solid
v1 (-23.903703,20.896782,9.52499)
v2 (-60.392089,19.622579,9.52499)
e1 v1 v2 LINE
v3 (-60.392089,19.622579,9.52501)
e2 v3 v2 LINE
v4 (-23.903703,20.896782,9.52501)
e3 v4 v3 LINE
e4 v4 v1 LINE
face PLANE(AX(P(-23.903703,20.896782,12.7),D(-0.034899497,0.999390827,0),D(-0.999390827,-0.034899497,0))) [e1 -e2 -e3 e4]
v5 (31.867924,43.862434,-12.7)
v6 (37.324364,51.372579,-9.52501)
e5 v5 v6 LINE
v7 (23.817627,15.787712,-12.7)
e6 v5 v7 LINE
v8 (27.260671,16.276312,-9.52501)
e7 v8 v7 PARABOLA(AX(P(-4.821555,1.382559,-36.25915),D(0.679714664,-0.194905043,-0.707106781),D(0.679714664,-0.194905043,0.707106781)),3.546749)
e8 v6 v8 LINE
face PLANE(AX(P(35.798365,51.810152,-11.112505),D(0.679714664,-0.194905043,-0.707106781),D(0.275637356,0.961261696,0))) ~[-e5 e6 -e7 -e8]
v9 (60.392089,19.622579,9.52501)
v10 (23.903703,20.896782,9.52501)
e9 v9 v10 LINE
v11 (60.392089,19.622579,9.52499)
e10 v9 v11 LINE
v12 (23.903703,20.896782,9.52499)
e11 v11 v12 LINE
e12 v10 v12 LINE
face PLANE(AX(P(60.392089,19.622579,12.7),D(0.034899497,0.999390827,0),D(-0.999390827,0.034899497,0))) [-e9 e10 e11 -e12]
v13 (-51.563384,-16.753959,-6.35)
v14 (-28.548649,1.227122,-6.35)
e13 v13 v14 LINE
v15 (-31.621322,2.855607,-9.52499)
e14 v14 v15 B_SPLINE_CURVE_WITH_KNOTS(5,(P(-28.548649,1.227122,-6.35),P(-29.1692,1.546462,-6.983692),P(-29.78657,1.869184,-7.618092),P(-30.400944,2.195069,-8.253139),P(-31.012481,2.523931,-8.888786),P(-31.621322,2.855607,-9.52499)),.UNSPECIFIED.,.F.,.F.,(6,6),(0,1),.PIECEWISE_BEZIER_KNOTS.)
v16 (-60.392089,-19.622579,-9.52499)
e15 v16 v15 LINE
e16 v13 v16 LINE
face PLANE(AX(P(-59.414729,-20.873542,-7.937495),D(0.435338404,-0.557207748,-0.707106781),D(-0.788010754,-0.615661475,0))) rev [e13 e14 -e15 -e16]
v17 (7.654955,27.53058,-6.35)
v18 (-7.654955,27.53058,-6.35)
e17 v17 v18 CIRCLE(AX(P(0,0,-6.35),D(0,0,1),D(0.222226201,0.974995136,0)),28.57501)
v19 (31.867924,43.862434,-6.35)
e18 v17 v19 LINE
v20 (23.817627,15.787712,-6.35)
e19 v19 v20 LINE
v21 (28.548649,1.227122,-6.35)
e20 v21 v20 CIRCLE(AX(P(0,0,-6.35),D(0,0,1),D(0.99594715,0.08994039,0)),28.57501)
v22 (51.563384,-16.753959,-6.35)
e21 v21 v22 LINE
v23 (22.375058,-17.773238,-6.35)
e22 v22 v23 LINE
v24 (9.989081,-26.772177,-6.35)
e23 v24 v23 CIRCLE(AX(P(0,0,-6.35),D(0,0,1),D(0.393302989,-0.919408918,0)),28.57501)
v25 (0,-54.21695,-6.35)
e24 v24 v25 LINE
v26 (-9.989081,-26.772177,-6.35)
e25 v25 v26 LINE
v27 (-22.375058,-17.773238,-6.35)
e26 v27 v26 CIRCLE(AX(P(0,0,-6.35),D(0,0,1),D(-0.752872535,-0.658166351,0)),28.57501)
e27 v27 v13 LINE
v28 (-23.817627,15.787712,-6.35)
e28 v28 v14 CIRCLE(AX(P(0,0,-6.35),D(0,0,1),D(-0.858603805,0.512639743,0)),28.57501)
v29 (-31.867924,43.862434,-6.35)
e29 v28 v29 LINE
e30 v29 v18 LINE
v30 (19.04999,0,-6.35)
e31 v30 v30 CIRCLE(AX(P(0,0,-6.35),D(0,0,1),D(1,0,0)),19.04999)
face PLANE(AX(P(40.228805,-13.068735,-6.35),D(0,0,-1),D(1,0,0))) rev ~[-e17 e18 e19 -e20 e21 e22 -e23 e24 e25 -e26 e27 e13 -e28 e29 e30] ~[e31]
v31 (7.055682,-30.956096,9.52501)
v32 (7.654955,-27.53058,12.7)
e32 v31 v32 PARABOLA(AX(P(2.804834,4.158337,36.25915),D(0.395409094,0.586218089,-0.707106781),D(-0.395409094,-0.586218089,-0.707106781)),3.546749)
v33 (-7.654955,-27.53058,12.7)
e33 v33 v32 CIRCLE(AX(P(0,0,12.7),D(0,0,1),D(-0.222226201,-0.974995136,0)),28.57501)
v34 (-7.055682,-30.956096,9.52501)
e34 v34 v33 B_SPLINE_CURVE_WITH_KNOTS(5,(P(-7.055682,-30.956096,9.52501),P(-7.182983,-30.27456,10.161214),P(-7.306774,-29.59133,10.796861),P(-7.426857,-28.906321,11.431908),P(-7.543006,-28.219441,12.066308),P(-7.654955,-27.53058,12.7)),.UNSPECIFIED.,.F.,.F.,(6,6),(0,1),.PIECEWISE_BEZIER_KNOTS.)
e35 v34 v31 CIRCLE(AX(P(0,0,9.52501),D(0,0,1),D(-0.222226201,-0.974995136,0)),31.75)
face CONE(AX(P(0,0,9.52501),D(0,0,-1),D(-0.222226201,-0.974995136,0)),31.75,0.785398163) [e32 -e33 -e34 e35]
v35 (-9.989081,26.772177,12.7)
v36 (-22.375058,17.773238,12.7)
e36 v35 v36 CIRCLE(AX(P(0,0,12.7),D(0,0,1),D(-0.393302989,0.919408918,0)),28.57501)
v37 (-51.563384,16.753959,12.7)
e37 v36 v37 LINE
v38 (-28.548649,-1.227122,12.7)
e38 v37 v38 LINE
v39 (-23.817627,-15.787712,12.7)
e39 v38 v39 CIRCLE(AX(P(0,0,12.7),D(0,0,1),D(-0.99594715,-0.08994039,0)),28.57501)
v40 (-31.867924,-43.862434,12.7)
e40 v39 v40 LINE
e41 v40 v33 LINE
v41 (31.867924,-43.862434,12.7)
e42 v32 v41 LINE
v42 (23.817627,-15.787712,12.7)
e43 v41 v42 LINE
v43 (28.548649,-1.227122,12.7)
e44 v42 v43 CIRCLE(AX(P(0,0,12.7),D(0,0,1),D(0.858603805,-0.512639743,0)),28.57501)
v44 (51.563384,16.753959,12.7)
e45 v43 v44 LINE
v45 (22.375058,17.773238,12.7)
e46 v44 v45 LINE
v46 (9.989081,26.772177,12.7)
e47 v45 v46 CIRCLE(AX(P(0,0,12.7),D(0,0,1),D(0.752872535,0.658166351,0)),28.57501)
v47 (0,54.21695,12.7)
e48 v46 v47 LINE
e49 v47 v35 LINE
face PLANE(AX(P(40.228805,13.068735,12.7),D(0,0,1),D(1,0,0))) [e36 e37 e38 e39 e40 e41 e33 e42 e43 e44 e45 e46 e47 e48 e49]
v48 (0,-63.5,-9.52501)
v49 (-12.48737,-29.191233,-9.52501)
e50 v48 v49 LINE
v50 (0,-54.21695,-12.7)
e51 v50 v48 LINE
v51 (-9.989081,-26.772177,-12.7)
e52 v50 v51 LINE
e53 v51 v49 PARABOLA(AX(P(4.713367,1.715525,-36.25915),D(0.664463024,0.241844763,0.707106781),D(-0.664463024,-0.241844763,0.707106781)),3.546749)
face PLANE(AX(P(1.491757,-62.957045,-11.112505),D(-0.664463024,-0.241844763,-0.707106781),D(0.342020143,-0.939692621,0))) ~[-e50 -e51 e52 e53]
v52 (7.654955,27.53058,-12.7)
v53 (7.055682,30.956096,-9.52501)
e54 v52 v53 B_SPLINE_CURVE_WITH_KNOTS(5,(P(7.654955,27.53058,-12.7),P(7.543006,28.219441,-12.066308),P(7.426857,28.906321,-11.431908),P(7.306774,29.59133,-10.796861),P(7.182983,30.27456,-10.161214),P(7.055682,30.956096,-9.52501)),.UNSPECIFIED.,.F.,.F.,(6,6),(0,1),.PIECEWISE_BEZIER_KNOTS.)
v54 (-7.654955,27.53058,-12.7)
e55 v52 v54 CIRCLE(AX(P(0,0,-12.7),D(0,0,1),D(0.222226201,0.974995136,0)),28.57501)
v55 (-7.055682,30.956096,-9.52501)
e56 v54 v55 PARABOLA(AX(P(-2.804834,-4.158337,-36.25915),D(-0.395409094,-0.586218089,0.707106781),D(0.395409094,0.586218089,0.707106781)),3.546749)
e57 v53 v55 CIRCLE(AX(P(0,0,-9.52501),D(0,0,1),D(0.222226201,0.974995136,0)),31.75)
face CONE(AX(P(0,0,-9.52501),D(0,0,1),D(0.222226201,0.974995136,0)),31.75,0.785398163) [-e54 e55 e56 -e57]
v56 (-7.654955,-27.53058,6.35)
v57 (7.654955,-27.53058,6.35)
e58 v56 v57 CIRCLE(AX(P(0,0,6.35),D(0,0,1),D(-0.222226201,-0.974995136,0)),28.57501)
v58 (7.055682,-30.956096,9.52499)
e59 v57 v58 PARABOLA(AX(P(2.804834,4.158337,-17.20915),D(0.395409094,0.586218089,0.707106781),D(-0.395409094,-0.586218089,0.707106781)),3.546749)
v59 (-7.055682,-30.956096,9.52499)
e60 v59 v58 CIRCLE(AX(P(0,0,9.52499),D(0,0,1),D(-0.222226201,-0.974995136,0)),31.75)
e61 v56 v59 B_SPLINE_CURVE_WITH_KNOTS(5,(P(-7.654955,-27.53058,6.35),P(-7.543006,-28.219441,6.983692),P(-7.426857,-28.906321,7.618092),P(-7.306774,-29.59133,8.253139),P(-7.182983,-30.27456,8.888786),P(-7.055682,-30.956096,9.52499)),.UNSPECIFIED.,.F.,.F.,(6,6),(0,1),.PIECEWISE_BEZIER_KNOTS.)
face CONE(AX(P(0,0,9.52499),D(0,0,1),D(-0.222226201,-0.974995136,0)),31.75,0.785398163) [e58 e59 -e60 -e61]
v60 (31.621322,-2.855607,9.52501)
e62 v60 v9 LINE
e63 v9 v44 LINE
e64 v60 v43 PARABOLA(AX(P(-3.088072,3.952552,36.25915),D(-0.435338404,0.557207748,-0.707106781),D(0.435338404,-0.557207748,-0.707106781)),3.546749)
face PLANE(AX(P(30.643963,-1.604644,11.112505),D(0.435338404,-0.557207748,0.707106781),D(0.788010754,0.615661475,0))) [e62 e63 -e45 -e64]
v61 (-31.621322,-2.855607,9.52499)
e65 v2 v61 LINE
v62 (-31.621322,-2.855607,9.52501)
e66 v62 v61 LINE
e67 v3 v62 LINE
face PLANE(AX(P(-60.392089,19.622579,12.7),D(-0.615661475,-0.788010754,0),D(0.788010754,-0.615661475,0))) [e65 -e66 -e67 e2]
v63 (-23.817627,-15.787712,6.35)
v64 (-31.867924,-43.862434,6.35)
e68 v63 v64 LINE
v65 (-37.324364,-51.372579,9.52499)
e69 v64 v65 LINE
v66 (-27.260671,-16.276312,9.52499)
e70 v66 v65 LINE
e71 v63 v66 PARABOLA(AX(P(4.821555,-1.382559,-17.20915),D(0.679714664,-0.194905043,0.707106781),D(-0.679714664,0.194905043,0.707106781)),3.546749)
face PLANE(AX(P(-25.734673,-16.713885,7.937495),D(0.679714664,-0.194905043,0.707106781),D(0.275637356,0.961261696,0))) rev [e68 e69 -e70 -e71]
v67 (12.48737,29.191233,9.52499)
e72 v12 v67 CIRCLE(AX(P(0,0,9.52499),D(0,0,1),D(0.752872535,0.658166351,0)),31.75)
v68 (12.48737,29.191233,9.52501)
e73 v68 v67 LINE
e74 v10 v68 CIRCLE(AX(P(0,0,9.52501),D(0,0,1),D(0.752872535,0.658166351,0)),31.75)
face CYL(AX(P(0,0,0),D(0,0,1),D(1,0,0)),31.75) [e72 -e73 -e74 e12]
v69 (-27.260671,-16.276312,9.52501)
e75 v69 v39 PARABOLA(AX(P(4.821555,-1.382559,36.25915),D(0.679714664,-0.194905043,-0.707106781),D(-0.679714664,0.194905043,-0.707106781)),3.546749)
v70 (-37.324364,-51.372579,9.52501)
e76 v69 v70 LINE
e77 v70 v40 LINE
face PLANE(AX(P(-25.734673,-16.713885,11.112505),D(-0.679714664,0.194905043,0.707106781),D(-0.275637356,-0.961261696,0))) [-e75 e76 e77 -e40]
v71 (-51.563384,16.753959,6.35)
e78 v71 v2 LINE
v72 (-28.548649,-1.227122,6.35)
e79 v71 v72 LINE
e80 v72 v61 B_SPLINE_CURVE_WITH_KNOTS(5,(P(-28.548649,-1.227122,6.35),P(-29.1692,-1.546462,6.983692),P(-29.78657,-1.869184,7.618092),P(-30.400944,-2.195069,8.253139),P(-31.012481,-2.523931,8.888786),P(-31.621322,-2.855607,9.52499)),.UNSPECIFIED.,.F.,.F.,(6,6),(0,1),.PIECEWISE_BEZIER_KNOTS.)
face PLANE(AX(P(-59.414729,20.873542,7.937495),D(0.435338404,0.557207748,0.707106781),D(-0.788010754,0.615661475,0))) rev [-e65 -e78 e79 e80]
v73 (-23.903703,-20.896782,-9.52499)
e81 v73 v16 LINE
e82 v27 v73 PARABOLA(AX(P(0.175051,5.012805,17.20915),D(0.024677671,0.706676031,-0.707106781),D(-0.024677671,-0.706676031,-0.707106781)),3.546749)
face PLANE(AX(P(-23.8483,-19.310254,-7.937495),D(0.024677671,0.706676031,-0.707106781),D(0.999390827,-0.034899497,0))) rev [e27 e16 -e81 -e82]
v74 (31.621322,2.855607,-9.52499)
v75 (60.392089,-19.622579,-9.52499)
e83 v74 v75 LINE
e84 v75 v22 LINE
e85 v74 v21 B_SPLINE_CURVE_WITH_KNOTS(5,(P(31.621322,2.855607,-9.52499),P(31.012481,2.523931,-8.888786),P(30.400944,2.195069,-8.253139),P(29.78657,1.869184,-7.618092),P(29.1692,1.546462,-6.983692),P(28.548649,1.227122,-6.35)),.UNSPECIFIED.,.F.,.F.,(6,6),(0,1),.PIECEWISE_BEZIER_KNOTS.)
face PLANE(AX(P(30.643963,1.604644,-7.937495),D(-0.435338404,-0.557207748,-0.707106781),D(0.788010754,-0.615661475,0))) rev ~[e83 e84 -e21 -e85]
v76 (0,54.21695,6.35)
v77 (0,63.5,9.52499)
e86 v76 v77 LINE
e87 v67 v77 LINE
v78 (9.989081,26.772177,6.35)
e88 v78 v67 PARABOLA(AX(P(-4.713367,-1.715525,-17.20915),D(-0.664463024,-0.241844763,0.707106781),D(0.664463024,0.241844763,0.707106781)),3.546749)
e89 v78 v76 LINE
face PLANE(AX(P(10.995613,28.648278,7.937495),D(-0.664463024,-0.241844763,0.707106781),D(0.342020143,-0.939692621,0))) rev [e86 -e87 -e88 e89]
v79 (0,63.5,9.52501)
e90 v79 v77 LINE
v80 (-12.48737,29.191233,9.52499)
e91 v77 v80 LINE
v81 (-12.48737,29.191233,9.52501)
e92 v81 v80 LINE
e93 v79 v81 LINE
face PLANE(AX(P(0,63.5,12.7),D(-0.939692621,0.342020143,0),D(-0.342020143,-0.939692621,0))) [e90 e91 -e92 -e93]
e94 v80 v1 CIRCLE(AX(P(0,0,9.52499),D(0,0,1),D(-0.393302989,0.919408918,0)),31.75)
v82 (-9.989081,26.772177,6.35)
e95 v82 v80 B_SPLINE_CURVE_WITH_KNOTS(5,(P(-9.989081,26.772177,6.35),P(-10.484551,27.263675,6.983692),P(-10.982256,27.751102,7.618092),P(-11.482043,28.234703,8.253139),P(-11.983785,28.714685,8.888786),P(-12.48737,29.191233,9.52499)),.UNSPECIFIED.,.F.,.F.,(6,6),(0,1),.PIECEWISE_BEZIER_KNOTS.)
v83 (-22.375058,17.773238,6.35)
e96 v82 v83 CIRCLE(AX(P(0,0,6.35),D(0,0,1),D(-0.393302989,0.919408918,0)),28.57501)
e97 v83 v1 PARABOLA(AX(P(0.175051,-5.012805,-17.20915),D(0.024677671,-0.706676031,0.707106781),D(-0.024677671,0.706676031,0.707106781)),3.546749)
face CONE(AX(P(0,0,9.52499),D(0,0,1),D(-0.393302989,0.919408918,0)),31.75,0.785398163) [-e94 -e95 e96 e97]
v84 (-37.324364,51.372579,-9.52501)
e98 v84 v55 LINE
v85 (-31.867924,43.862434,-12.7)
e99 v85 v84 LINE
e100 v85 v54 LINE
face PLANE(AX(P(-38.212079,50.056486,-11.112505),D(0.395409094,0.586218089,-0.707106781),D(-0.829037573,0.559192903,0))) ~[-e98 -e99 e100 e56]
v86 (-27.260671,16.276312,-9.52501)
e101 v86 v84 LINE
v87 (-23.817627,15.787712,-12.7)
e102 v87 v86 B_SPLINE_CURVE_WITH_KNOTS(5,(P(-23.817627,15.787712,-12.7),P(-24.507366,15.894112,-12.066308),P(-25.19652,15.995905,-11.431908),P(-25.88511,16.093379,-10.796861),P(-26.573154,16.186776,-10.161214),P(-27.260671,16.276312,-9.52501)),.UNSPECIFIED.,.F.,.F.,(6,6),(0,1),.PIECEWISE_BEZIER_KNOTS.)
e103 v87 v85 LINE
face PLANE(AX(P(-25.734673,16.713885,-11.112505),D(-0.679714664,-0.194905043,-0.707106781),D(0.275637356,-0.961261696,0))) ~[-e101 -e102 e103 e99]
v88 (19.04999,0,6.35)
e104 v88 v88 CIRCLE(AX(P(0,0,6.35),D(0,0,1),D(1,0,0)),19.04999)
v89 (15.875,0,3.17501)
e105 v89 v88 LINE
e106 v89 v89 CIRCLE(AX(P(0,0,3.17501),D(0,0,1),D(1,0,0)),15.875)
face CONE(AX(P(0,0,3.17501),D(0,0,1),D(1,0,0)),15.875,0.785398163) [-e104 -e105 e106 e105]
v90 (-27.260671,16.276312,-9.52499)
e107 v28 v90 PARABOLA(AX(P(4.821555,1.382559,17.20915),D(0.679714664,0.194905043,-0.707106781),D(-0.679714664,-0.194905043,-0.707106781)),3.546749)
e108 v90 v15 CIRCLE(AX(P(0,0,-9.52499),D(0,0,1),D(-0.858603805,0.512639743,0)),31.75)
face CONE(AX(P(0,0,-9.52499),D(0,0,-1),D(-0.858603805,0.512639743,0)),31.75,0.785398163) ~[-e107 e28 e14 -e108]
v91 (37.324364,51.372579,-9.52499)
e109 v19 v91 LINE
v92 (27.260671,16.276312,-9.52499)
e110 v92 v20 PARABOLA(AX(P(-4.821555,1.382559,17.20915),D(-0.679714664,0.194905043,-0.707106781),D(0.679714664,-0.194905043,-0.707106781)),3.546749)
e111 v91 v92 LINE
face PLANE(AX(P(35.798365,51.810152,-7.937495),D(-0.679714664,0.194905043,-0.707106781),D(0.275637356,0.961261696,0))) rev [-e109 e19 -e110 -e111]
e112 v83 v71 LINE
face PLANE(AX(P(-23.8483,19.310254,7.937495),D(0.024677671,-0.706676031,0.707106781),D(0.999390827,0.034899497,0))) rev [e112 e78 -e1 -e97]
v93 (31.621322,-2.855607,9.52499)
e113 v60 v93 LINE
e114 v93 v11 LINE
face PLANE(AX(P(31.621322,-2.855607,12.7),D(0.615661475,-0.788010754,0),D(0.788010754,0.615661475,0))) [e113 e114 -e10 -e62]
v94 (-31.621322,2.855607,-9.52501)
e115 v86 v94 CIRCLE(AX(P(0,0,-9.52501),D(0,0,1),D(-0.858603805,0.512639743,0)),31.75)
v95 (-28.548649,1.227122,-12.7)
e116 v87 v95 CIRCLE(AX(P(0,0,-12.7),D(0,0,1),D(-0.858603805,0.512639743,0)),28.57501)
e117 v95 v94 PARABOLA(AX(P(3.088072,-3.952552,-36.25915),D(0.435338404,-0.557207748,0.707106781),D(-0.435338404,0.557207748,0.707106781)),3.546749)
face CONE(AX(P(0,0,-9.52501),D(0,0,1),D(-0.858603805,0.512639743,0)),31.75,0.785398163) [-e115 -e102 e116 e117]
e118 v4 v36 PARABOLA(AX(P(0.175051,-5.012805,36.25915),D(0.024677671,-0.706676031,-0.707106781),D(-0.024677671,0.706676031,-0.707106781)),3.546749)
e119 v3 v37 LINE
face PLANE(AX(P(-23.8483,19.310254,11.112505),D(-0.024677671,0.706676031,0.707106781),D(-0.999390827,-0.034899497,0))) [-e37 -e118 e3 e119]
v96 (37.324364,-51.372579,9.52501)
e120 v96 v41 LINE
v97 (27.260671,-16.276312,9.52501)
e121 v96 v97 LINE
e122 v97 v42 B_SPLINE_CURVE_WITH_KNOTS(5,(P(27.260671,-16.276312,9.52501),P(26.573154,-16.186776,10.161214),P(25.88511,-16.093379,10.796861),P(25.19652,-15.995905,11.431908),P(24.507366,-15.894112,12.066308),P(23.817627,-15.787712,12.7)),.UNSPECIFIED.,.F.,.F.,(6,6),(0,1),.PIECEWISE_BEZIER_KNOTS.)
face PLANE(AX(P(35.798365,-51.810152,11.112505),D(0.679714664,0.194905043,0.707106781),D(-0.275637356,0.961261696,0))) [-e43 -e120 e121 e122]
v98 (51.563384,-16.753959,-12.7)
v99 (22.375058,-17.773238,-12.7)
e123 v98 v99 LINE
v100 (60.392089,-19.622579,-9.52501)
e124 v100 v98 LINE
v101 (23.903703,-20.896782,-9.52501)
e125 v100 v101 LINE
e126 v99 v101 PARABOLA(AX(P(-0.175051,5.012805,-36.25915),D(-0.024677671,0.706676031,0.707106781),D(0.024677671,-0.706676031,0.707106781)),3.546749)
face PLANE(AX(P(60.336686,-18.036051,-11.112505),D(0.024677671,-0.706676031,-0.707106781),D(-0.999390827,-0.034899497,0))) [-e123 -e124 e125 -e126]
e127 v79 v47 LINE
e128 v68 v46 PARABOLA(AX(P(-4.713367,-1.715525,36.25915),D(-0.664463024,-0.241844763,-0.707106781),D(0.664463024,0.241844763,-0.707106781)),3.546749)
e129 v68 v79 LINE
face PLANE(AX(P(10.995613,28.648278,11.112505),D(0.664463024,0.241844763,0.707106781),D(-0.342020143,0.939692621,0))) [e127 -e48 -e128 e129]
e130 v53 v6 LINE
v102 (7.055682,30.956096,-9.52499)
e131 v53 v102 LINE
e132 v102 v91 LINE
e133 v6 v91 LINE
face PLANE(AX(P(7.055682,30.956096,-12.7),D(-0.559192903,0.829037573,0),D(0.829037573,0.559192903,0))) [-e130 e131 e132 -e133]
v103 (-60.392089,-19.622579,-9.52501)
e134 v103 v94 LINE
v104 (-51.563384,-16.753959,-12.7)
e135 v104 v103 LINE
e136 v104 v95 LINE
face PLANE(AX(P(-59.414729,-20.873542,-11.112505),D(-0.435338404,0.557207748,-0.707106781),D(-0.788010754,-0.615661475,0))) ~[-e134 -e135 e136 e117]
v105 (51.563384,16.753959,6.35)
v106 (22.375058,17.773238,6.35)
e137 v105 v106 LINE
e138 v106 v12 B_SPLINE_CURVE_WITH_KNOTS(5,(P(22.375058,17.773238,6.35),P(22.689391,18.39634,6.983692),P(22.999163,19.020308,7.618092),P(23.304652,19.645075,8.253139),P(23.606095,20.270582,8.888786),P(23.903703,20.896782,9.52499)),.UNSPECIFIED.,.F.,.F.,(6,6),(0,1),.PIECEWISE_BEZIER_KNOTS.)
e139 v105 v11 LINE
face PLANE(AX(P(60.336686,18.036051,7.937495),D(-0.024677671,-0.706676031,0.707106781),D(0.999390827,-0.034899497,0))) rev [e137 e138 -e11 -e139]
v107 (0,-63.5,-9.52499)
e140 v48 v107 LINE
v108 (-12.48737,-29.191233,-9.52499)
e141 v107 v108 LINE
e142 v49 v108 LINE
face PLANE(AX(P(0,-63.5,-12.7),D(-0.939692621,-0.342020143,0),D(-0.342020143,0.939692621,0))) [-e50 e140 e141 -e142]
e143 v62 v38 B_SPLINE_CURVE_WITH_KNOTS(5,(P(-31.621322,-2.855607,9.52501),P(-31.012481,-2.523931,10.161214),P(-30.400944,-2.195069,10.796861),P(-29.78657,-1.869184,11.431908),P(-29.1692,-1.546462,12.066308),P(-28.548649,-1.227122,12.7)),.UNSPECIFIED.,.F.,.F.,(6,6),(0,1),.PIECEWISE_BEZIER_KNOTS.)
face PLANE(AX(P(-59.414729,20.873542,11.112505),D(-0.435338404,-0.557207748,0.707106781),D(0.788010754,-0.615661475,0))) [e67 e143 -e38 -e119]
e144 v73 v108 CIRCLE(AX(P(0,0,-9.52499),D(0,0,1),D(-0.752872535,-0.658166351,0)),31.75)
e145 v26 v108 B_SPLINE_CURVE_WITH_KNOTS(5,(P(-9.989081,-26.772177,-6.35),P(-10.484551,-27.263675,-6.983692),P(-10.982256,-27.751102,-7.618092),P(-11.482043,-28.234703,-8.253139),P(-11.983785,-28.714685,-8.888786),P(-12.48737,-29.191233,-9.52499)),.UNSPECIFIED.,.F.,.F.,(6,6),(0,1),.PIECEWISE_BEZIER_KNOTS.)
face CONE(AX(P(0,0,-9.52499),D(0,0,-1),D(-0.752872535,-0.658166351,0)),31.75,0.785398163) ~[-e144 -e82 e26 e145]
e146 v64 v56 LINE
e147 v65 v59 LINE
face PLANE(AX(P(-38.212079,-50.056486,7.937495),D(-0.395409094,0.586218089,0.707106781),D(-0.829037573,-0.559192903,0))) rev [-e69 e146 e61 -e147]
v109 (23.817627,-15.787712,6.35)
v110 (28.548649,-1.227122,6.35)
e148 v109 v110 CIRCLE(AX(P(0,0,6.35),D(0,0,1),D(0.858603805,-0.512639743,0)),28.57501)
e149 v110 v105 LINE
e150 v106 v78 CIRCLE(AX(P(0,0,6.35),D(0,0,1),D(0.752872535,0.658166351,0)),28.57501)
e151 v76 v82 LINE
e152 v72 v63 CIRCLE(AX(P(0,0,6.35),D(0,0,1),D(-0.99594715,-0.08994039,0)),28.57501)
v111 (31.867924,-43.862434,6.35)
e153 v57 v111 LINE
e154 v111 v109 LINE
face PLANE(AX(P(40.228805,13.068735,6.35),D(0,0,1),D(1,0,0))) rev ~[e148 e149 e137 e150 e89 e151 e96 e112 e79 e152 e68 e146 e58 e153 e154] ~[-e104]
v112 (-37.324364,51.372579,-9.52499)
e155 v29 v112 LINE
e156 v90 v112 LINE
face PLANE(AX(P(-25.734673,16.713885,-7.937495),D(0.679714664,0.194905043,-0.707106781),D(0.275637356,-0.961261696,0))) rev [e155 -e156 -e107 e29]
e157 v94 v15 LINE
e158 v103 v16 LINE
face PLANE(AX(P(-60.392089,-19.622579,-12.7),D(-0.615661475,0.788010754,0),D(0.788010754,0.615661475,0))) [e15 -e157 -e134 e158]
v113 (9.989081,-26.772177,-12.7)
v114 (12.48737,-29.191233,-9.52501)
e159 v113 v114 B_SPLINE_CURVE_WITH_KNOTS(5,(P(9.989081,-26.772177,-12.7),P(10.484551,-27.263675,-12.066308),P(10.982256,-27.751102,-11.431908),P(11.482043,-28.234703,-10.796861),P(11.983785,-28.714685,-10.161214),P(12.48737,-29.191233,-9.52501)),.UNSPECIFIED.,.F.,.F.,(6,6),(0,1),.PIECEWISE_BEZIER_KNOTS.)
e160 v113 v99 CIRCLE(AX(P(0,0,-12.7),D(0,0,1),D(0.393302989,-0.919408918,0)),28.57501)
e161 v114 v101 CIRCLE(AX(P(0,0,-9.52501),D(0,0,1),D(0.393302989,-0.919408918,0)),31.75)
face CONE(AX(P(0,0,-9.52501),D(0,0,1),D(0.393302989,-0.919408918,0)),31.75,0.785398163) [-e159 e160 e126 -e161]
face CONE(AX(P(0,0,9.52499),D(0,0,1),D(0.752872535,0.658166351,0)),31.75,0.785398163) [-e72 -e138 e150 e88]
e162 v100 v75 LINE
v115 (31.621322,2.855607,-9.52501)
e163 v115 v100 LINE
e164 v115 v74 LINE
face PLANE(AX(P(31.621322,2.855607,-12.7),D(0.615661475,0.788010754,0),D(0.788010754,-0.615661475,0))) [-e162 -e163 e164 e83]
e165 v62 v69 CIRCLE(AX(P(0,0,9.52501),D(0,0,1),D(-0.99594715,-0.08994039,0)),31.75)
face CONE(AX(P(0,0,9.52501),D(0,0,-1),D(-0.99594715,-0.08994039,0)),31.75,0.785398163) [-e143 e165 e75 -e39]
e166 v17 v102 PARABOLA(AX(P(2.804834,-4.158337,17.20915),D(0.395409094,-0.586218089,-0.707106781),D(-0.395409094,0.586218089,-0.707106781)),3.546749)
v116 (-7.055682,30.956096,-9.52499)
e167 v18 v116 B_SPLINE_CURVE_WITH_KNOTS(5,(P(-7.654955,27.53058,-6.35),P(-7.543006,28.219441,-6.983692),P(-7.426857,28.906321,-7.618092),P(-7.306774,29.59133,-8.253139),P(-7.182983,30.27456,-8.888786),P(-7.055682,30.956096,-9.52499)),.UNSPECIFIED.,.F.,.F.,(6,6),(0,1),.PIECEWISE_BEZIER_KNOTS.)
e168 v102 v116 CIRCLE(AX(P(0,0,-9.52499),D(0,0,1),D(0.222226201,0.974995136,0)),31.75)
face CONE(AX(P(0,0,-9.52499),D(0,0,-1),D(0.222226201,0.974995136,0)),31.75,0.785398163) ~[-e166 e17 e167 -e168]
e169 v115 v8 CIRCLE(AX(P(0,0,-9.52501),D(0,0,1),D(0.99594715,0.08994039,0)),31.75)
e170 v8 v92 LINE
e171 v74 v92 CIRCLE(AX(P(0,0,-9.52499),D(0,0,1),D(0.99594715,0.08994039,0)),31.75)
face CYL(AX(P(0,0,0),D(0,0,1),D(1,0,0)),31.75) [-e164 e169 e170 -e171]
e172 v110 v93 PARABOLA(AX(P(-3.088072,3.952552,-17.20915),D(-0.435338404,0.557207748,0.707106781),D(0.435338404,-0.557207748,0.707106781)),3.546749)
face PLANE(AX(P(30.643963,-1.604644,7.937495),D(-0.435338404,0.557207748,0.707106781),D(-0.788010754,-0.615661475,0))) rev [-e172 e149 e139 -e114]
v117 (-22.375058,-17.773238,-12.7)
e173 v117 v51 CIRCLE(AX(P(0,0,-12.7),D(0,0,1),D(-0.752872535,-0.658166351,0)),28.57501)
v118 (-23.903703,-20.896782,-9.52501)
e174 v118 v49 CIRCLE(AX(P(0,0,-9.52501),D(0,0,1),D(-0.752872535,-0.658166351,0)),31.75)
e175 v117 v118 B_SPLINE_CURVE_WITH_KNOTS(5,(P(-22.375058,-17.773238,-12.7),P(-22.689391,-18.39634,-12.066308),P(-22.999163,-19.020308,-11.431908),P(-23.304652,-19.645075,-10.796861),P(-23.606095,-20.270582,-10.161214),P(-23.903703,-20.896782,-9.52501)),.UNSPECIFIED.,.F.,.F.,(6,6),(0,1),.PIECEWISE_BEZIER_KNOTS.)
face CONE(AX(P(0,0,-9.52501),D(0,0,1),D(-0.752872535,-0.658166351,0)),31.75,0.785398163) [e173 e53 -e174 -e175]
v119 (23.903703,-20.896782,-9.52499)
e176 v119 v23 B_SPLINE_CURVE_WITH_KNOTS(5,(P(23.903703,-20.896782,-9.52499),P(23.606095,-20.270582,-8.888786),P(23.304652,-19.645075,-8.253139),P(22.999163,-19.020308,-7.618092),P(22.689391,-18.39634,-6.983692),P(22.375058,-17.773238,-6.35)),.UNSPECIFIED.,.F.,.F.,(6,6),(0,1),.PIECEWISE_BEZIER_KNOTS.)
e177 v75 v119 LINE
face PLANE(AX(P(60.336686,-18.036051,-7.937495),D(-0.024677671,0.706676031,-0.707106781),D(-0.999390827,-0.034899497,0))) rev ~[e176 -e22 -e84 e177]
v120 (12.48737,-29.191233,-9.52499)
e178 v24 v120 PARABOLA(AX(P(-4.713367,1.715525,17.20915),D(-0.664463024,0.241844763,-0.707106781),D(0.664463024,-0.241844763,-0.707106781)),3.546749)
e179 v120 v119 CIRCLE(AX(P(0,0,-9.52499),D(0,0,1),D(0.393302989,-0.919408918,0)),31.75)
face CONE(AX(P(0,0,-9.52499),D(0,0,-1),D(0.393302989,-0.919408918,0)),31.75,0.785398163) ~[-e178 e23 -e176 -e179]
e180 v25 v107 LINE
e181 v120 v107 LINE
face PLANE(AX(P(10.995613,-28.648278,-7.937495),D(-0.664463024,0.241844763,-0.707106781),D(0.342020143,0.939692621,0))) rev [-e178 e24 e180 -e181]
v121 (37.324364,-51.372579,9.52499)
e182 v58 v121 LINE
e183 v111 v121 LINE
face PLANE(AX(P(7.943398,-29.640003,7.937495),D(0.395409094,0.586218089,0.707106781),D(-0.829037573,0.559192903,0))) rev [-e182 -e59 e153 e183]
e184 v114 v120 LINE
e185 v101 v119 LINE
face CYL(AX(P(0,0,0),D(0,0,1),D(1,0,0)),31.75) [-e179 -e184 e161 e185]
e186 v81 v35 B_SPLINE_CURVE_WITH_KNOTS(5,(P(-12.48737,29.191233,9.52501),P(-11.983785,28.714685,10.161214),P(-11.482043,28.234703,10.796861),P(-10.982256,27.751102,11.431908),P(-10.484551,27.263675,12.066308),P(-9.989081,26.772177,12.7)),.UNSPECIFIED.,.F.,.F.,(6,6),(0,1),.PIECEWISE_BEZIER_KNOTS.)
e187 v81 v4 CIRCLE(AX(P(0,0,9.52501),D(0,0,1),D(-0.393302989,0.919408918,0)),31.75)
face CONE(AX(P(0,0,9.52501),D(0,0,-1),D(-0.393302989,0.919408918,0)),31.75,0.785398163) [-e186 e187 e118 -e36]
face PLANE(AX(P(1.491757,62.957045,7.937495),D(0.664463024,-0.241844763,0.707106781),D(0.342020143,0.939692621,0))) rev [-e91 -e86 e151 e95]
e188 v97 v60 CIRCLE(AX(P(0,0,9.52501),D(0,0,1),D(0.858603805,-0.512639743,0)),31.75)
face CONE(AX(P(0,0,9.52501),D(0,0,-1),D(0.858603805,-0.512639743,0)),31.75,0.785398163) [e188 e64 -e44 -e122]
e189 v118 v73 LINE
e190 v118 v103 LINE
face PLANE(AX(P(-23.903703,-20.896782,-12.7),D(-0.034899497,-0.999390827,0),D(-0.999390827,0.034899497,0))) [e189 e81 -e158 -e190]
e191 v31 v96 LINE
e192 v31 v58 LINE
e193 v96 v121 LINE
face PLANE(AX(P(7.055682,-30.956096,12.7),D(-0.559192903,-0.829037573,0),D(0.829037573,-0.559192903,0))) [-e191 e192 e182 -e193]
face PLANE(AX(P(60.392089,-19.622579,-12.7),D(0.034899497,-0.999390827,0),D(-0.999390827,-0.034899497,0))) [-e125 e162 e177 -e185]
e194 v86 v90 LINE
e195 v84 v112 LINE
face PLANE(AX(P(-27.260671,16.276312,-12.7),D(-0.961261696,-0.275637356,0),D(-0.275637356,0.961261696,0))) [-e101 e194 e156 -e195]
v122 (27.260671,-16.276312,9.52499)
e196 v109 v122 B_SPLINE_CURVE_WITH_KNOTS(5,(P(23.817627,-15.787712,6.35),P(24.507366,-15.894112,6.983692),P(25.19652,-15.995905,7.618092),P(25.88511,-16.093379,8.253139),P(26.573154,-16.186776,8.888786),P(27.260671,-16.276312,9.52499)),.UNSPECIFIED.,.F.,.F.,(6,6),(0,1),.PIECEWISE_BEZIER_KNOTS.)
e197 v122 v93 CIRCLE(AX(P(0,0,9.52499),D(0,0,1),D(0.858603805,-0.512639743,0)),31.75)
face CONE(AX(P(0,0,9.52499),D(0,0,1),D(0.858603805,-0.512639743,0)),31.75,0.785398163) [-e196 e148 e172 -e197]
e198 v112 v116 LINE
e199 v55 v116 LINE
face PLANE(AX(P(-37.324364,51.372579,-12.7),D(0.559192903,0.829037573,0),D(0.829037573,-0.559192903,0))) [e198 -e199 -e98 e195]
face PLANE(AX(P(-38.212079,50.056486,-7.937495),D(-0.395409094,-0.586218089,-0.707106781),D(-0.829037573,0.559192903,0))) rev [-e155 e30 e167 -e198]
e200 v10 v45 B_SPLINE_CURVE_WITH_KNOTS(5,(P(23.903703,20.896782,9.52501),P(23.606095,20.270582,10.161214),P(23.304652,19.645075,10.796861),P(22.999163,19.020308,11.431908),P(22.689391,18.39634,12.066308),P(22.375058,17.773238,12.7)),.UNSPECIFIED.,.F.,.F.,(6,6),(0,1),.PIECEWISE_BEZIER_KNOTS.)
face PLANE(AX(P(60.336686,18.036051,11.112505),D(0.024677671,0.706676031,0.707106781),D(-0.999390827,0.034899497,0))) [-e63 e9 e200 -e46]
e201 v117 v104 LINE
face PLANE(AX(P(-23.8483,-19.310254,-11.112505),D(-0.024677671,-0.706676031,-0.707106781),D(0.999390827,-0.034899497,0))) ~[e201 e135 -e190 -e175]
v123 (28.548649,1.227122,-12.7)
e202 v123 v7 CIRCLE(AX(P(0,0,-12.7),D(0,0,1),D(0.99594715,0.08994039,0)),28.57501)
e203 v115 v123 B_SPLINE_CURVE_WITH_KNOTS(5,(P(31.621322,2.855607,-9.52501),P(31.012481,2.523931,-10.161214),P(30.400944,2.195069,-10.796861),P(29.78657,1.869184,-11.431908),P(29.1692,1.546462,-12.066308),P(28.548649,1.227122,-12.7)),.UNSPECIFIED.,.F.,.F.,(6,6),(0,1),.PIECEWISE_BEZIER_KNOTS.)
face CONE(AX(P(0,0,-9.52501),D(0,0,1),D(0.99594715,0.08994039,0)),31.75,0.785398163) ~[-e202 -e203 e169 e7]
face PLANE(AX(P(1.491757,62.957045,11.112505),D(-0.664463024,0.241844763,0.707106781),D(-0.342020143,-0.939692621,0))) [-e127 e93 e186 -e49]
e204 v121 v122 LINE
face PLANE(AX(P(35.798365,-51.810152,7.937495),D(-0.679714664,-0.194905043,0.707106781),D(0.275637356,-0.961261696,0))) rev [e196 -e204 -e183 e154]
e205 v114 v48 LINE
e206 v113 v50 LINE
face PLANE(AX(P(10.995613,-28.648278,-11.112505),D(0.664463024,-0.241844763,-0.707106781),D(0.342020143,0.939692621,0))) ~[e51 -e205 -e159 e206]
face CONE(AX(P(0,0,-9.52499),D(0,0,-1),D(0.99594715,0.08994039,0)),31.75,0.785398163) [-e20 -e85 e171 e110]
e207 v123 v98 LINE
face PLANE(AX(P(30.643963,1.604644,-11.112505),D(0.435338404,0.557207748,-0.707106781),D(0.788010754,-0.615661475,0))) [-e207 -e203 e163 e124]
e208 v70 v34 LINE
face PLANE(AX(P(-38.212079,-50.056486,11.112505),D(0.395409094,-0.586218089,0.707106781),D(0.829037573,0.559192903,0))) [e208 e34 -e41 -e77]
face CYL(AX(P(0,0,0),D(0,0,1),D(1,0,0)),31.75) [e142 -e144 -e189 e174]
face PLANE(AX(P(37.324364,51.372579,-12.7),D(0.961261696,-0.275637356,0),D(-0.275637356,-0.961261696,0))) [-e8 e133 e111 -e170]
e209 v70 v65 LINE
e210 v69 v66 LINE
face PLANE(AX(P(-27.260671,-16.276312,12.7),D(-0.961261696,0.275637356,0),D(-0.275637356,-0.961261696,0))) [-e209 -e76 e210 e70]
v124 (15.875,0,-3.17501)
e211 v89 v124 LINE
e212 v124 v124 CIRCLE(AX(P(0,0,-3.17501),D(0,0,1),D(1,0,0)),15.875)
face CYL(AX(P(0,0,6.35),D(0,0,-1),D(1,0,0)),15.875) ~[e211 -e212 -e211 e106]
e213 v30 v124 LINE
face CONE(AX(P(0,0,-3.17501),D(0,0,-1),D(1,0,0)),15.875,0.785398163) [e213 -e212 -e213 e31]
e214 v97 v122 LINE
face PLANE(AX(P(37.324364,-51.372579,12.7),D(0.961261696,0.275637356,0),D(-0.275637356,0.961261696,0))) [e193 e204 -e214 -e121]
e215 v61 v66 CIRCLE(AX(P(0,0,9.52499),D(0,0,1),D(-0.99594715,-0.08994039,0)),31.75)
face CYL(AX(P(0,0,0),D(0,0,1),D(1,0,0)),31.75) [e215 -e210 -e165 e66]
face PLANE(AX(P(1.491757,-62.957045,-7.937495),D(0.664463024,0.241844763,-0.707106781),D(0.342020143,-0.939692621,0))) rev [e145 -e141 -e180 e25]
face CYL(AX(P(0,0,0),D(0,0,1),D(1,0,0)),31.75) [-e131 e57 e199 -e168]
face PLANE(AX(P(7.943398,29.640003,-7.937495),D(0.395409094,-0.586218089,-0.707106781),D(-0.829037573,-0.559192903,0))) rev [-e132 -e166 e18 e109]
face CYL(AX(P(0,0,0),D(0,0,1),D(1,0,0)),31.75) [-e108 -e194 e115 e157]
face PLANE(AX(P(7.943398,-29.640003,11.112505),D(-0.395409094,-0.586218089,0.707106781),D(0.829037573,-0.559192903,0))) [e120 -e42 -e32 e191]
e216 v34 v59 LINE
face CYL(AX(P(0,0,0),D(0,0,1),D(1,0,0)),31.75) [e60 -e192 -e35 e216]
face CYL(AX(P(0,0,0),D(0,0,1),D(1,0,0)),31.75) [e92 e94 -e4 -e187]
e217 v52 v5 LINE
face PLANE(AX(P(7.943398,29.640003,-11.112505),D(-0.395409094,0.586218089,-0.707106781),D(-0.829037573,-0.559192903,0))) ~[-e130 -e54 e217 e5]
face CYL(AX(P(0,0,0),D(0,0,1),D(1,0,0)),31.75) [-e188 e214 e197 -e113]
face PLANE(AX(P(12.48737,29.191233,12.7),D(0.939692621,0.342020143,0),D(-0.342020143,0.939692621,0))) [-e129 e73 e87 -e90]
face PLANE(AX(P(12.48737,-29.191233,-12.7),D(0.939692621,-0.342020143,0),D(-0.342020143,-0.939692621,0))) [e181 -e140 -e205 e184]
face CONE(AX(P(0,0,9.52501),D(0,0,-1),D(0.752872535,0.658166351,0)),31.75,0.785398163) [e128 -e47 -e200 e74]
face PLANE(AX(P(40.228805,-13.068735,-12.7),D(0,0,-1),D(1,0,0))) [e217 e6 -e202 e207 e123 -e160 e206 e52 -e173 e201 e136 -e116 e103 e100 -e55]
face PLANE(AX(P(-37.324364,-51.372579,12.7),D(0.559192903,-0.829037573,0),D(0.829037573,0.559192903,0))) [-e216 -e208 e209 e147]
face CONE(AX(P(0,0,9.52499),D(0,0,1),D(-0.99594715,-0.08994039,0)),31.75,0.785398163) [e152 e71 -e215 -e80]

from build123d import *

# Parameters (mm, degrees)
F0_R     = 31.75
F1_DEPTH = 12.7
F5_DEPTH = 6.35
F7_DEPTH = 6.35
F8_SIZE  = 3.17499


# Not quite as in the source:
# - a fillet or chamfer is up to 0.001 mm smaller than in the source, because OpenCascade refuses the exact size


with BuildPart() as f1:
    # F0 (on Top) → F1 (new body, symmetric)
    with BuildSketch(Plane.XY):
        Circle(F0_R)
    extrude(amount=F1_DEPTH, both=True)

    # F2 (on Front) → F3 (revolve, cut)
    with BuildSketch(Plane.XZ):
        Polygon((31.75, 6.35), (15.875, 6.35), (15.875, -6.35), (31.75, -6.35), (33.2811660987, -6.35), (33.2811660987, 6.35), align=None)
    revolve(axis=Axis((0, 0, 3.175), (0, 0, 1)), mode=Mode.SUBTRACT)

    # F4 (on face) → F5 (join)
    with BuildSketch(Plane.XY.offset(12.7)):
        with BuildLine():
            ThreePointArc((0, 31.75), (6.3734153916, 31.1037309056), (12.487369908, 29.1912331494))
            Line((12.487369908, 29.1912331494), (0, 63.5))
            Line((0, 63.5), (0, 31.75))
        make_face()
        with BuildLine():
            ThreePointArc((-12.487369908, 29.1912331494), (-6.3734153916, 31.1037309056), (0, 31.75))
            Line((0, 31.75), (0, 63.5))
            Line((0, 63.5), (-12.487369908, 29.1912331494))
        make_face()
        with BuildLine():
            ThreePointArc((-31.621322022, -2.8556073925), (-30.1960443924, 9.8112895714), (-23.9037029888, 20.8967816523))
            Line((-23.9037029888, 20.8967816523), (-60.3920887847, 19.6225791428))
            Line((-60.3920887847, 19.6225791428), (-31.621322022, -2.8556073925))
        make_face()
        with BuildLine():
            Line((-37.3243635206, -51.3725791428), (-7.0556818708, -30.9560955764))
            ThreePointArc((-7.0556818708, -30.9560955764), (-18.6621817603, -25.6862895714), (-27.2606708121, -16.2763118327))
            Line((-27.2606708121, -16.2763118327), (-37.3243635206, -51.3725791428))
        make_face()
        with BuildLine():
            Line((37.3243635206, -51.3725791428), (27.2606708121, -16.2763118327))
            ThreePointArc((27.2606708121, -16.2763118327), (18.6621817603, -25.6862895714), (7.0556818708, -30.9560955764))
            Line((7.0556818708, -30.9560955764), (37.3243635206, -51.3725791428))
        make_face()
        with BuildLine():
            ThreePointArc((23.9037029888, 20.8967816523), (29.7237705372, 11.160643577), (31.75, 0))
            ThreePointArc((31.75, 0), (31.7178141917, -1.4292525671), (31.621322022, -2.8556073925))
            Line((31.621322022, -2.8556073925), (60.3920887847, 19.6225791428))
            Line((60.3920887847, 19.6225791428), (23.9037029888, 20.8967816523))
        make_face()
    extrude(amount=-F5_DEPTH)

    # F6 (on face) → F7 (join)
    with BuildSketch(Plane(origin=(0, 0, -12.7), x_dir=(1, 0, 0), z_dir=(0, 0, -1))):
        with BuildLine():
            ThreePointArc((-12.487369908, 29.1912331494), (-6.3734153916, 31.1037309056), (0, 31.75))
            Line((0, 31.75), (0, 63.5))
            Line((0, 63.5), (-12.487369908, 29.1912331494))
        make_face()
        with BuildLine():
            ThreePointArc((0, 31.75), (6.3734153916, 31.1037309056), (12.487369908, 29.1912331494))
            Line((12.487369908, 29.1912331494), (0, 63.5))
            Line((0, 63.5), (0, 31.75))
        make_face()
        with BuildLine():
            ThreePointArc((-31.621322022, -2.8556073925), (-30.1960443924, 9.8112895714), (-23.9037029888, 20.8967816523))
            Line((-23.9037029888, 20.8967816523), (-60.3920887847, 19.6225791428))
            Line((-60.3920887847, 19.6225791428), (-31.621322022, -2.8556073925))
        make_face()
        with BuildLine():
            ThreePointArc((23.9037029888, 20.8967816523), (29.7237705372, 11.160643577), (31.75, 0))
            ThreePointArc((31.75, 0), (31.7178141917, -1.4292525671), (31.621322022, -2.8556073925))
            Line((31.621322022, -2.8556073925), (60.3920887847, 19.6225791428))
            Line((60.3920887847, 19.6225791428), (23.9037029888, 20.8967816523))
        make_face()
        with BuildLine():
            Line((-37.3243635206, -51.3725791428), (-7.0556818708, -30.9560955764))
            ThreePointArc((-7.0556818708, -30.9560955764), (-18.6621817603, -25.6862895714), (-27.2606708121, -16.2763118327))
            Line((-27.2606708121, -16.2763118327), (-37.3243635206, -51.3725791428))
        make_face()
        with BuildLine():
            Line((37.3243635206, -51.3725791428), (27.2606708121, -16.2763118327))
            ThreePointArc((27.2606708121, -16.2763118327), (18.6621817603, -25.6862895714), (7.0556818708, -30.9560955764))
            Line((7.0556818708, -30.9560955764), (37.3243635206, -51.3725791428))
        make_face()
    extrude(amount=-F7_DEPTH)

    # F8 (size 3.175 in the source; OpenCascade refuses exactly that, so slightly less here)
    f8_edges = [f1.edges().sort_by_distance(p)[0] for p in [
        (18.662182, 25.68629, 12.7),
        (6.243685, 46.345617, 12.7),
        (-6.243685, 46.345617, 12.7),
        (-18.662182, 25.68629, 12.7),
        (-42.147896, 20.25968, 12.7),
        (-46.006705, 8.383486, 12.7),
        (-30.196044, -9.81129, 12.7),
        (-32.292517, -33.824445, 12.7),
        (-22.190023, -41.164337, 12.7),
        (0, -31.75, 12.7),
        (22.190023, -41.164337, 12.7),
        (32.292517, -33.824445, 12.7),
        (30.196044, -9.81129, 12.7),
        (46.006705, 8.383486, 12.7),
        (42.147896, 20.25968, 12.7),
        (30.196044, 9.81129, -6.35),
        (46.006705, -8.383486, -6.35),
        (42.147896, -20.25968, -6.35),
        (18.662182, -25.68629, -6.35),
        (6.243685, -46.345617, -6.35),
        (-6.243685, -46.345617, -6.35),
        (-18.662182, -25.68629, -6.35),
        (-42.147896, -20.25968, -6.35),
        (-46.006705, -8.383486, -6.35),
        (-30.196044, 9.81129, -6.35),
        (-32.292517, 33.824445, -6.35),
        (-22.190023, 41.164337, -6.35),
        (0, 31.75, -6.35),
        (22.190023, 41.164337, -6.35),
        (32.292517, 33.824445, -6.35),
        (-15.875, 0, -6.35),
        (18.662182, 25.68629, 6.35),
        (6.243685, 46.345617, 6.35),
        (-6.243685, 46.345617, 6.35),
        (-18.662182, 25.68629, 6.35),
        (-42.147896, 20.25968, 6.35),
        (-46.006705, 8.383486, 6.35),
        (-30.196044, -9.81129, 6.35),
        (-32.292517, -33.824445, 6.35),
        (-22.190023, -41.164337, 6.35),
        (0, -31.75, 6.35),
        (22.190023, -41.164337, 6.35),
        (32.292517, -33.824445, 6.35),
        (30.196044, -9.81129, 6.35),
        (46.006705, 8.383486, 6.35),
        (42.147896, 20.25968, 6.35),
        (-15.875, 0, 6.35),
        (30.196044, 9.81129, -12.7),
        (32.292517, 33.824445, -12.7),
        (22.190023, 41.164337, -12.7),
        (0, 31.75, -12.7),
        (-22.190023, 41.164337, -12.7),
        (-32.292517, 33.824445, -12.7),
        (-30.196044, 9.81129, -12.7),
        (-46.006705, -8.383486, -12.7),
        (-42.147896, -20.25968, -12.7),
        (-18.662182, -25.68629, -12.7),
        (-6.243685, -46.345617, -12.7),
        (6.243685, -46.345617, -12.7),
        (18.662182, -25.68629, -12.7),
        (42.147896, -20.25968, -12.7),
        (46.006705, -8.383486, -12.7),
    ]]
    chamfer(f8_edges, length=F8_SIZE)


solid = f1.part
